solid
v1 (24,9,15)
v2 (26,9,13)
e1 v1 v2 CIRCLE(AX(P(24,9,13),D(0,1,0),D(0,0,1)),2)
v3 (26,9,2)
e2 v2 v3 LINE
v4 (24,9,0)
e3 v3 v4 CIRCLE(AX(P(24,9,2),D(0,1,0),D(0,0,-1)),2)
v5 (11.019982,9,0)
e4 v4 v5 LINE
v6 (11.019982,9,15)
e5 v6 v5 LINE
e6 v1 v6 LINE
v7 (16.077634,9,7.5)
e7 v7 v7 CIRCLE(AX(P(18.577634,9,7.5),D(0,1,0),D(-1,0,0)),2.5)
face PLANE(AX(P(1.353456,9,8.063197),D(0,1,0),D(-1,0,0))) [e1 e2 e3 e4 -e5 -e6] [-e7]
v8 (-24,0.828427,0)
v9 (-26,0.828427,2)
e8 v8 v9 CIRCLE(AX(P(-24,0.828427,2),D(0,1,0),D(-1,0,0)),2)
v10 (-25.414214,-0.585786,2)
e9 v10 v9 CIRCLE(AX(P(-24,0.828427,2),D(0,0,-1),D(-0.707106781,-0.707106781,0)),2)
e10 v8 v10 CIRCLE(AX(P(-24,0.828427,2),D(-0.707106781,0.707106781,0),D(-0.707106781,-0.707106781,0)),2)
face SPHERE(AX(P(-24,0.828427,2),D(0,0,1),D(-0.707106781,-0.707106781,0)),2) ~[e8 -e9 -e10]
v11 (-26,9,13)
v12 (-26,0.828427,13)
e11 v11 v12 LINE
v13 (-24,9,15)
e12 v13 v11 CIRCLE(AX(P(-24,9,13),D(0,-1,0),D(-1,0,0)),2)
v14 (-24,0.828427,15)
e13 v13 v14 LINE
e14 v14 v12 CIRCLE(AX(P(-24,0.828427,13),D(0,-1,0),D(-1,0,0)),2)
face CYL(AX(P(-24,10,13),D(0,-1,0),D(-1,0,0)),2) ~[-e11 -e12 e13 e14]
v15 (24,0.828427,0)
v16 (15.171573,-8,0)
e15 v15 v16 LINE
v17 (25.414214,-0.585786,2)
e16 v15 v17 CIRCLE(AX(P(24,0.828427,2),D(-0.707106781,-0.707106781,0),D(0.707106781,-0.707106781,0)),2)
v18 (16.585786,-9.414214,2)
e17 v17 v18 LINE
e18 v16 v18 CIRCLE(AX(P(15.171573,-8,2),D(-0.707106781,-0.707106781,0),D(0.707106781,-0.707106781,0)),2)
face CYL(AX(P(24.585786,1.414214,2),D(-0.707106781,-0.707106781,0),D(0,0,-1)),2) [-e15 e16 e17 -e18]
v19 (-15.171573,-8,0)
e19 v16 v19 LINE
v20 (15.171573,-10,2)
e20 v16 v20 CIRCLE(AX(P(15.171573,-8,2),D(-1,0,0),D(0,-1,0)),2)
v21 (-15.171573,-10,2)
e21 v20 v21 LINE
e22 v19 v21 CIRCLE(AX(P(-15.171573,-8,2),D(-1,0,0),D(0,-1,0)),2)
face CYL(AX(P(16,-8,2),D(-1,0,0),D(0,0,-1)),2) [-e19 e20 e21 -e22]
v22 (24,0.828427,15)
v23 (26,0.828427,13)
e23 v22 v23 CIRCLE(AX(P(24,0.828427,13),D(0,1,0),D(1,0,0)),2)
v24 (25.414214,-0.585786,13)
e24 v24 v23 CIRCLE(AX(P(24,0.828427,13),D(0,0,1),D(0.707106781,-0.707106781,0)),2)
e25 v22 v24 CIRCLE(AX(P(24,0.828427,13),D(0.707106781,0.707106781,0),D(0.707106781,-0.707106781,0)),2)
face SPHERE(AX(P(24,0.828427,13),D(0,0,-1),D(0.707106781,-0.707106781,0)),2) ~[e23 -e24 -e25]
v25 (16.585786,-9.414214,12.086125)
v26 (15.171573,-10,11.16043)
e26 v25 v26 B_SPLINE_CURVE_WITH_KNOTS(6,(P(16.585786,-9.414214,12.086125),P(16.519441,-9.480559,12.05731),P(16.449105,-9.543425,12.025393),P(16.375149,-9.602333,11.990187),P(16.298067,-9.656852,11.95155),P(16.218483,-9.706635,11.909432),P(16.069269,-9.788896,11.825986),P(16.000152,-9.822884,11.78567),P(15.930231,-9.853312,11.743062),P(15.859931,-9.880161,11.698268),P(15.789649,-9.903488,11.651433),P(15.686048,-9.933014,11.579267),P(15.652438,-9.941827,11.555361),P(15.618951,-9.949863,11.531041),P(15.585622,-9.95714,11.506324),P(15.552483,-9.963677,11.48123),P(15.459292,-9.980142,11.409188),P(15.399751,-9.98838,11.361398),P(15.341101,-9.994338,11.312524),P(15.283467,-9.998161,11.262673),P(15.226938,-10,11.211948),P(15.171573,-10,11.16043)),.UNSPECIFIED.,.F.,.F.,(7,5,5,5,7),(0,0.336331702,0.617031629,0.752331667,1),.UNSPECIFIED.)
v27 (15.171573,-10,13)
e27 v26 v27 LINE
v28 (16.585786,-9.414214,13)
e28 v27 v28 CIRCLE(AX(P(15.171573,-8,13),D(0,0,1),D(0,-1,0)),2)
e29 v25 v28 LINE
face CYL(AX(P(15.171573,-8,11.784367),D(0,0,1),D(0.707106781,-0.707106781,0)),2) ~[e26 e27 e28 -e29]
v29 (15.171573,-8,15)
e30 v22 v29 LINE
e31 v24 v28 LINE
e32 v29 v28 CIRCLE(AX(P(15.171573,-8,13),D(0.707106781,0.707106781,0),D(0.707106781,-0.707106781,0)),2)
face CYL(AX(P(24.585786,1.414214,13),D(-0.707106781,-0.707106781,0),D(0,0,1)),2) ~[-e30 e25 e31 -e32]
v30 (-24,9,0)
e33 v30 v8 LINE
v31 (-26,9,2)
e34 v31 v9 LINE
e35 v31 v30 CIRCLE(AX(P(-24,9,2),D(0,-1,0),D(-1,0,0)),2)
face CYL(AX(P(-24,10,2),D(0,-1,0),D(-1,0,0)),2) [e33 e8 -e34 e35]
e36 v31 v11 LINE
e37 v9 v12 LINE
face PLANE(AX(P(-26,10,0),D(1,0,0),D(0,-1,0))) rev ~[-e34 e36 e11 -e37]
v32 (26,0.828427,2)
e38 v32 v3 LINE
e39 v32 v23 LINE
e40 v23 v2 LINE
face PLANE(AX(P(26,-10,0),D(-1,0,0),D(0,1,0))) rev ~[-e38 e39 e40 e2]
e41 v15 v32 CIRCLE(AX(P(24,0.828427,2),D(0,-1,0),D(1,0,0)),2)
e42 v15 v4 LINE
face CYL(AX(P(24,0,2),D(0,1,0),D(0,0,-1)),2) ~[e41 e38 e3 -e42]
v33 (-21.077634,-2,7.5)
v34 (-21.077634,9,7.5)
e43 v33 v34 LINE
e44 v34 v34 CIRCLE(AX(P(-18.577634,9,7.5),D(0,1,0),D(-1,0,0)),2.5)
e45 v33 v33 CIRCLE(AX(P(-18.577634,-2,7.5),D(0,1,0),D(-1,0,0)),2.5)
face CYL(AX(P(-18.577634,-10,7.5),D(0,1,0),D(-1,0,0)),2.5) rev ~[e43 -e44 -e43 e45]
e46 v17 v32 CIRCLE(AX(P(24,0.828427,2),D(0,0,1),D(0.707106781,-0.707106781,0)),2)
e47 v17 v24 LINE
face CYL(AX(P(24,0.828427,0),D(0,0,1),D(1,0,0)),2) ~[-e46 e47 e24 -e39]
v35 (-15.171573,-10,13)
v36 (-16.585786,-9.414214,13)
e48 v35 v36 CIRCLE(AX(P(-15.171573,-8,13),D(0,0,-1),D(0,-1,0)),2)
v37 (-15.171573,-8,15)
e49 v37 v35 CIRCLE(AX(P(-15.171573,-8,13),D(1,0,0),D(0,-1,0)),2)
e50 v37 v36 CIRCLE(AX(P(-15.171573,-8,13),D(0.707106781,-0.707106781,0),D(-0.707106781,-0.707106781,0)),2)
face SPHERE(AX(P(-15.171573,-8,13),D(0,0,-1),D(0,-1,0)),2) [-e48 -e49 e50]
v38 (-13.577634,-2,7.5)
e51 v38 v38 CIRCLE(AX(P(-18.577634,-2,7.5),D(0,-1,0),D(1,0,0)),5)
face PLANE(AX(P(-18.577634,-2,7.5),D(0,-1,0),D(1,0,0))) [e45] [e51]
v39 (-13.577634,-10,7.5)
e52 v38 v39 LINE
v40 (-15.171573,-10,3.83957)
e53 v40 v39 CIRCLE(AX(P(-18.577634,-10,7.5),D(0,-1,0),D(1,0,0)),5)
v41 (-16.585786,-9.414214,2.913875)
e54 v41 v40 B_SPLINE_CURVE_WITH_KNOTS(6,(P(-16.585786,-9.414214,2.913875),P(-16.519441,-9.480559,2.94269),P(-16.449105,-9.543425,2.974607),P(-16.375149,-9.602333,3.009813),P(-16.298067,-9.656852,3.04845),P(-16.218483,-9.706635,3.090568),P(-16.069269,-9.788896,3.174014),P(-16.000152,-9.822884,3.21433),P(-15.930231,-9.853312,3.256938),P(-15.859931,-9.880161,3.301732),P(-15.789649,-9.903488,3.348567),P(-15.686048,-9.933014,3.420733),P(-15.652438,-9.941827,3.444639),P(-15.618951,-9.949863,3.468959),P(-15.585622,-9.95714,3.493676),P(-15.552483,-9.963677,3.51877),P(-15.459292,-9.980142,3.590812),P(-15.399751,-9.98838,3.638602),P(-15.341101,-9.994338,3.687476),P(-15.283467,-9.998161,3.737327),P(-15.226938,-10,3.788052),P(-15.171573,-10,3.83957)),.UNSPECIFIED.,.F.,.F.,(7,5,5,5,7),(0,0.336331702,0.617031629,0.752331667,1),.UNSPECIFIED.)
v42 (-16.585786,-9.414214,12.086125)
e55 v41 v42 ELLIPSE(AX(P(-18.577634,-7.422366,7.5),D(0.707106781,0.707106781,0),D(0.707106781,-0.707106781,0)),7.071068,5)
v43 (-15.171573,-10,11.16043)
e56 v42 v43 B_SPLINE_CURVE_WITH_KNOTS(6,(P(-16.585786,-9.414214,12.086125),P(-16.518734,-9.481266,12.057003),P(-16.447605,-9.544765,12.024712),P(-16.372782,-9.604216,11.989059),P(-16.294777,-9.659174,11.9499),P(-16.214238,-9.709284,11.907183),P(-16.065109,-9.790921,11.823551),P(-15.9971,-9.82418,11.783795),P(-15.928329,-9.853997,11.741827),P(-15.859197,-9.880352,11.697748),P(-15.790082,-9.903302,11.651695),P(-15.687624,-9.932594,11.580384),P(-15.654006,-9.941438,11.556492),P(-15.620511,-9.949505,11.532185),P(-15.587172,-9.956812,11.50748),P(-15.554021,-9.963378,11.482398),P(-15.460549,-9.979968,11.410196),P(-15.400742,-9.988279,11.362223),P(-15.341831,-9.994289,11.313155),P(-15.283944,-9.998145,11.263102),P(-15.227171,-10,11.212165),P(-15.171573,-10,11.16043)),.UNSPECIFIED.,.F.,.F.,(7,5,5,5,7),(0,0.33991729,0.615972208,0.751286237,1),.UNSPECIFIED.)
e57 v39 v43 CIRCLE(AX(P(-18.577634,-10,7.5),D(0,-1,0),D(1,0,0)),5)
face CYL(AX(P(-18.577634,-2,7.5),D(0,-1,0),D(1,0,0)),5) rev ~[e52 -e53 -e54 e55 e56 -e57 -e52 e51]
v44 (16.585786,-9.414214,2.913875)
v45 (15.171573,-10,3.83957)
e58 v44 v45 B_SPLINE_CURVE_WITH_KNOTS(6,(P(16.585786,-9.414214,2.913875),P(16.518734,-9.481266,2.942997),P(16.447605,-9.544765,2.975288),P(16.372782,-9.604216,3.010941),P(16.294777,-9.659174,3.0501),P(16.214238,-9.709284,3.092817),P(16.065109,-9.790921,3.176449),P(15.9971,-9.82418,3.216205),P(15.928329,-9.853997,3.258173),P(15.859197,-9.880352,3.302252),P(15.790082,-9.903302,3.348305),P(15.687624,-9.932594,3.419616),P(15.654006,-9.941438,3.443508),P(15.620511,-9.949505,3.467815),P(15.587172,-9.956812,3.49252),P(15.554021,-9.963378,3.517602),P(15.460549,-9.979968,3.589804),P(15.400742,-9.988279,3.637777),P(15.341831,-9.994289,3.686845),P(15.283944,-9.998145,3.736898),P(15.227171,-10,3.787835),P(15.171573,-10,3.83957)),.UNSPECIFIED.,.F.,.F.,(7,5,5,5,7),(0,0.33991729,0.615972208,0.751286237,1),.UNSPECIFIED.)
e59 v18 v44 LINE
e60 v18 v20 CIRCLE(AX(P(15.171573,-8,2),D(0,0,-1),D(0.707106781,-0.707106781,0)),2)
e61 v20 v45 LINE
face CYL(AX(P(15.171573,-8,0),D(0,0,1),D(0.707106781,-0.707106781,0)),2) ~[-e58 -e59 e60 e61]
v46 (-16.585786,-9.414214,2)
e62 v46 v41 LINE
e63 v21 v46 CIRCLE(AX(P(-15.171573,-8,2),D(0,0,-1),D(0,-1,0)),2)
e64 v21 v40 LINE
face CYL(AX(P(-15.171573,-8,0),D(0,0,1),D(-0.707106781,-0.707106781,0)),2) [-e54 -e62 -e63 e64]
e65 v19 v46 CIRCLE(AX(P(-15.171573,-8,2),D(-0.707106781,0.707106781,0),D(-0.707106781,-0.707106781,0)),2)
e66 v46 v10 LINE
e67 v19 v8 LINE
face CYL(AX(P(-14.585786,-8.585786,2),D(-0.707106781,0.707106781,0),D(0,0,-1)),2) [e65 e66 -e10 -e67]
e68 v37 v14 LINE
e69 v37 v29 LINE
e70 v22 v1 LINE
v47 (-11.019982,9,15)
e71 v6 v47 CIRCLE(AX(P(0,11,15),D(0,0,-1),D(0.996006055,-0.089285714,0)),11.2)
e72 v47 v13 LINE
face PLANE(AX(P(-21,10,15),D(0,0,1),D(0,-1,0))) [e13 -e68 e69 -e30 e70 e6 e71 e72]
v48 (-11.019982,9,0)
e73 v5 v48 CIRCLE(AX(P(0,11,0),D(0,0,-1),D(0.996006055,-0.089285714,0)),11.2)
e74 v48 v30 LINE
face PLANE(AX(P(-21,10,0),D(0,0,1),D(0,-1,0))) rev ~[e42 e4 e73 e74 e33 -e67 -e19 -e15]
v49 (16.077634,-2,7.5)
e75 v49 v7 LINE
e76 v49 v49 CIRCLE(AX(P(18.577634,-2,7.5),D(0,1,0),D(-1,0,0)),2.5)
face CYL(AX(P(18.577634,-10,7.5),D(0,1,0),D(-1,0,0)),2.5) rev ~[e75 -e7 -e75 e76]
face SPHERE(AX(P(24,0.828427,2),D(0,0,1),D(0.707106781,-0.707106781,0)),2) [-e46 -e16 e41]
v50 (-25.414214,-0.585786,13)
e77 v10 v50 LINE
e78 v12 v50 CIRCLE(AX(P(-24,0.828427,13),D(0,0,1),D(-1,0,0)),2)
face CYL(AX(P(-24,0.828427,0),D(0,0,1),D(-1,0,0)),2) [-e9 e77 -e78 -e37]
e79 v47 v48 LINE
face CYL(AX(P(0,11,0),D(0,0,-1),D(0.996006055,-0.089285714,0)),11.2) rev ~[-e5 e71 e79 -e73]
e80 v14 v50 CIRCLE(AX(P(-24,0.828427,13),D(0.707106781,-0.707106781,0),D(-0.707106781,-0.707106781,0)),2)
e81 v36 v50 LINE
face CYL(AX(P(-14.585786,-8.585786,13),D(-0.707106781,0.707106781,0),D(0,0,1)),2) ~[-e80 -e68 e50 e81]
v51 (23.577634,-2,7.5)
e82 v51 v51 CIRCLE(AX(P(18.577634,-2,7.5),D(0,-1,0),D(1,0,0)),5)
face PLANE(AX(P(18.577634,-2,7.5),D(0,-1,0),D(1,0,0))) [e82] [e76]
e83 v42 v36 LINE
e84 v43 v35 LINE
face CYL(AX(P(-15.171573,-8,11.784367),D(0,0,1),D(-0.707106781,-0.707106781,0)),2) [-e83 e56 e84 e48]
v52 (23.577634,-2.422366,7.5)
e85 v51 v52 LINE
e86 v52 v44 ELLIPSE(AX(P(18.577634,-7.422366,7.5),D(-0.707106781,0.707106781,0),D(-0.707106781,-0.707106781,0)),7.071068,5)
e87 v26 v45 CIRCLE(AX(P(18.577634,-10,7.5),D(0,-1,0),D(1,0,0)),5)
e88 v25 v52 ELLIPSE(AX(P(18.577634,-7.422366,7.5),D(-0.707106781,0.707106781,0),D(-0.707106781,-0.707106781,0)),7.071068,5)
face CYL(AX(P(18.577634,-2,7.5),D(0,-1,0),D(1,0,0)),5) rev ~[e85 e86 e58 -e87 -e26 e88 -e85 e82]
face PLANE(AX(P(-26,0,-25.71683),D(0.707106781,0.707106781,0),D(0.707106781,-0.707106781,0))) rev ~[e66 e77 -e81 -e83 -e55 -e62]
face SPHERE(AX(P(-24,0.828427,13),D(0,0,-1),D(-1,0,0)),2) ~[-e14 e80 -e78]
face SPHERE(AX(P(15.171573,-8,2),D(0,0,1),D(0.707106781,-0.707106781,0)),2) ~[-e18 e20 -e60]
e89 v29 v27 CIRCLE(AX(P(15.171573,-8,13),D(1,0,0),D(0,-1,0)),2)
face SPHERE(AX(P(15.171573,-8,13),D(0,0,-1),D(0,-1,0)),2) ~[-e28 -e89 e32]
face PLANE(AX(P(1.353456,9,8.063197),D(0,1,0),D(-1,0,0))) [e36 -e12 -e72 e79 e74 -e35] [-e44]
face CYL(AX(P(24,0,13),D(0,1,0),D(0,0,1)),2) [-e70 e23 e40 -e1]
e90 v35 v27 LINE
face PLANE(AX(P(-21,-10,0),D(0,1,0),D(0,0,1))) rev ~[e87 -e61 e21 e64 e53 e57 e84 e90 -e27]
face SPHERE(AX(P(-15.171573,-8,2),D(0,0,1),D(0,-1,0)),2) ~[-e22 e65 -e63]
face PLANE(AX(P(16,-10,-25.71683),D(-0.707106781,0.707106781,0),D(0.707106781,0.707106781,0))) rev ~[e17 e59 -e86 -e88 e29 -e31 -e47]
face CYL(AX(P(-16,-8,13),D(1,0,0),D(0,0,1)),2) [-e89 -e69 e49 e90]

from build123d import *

# Parameters (mm, degrees)
F1_DEPTH       = 15
F2_DEPTH       = 5
F3_DEPTH       = 5
F5_D           = 5
F5_CBORE_D     = 10
F5_CBORE_DEPTH = 8
F6_T1_DEPTH    = 66.4336597593
F7_R           = 2
F8_W           = 54.7069119513
F8_H           = 16.1263942719
F9_DEPTH       = 1


# Not quite as in the source:
# - a fillet or chamfer that OpenCascade refuses, or shapes differently, is made with other operations: its cross-section is extruded or revolved along the edge and cut away or added


with BuildPart() as f1:
    # F0 (on Top) → F1 (new body)
    with BuildSketch(Plane.XY):
        with BuildLine():
            Line((-21, -10), (21, -10))
            Line((21, -10), (21, 10))
            Line((21, 10), (11.1552678139, 10))
            ThreePointArc((11.1552678139, 10), (0, -0.2), (-11.1552678139, 10))
            Line((-11.1552678139, 10), (-21, 10))
            Line((-21, 10), (-21, -10))
        make_face()
    extrude(amount=F1_DEPTH)

    # F2 (add): a face of the model
    f2_faces = [f1.faces().sort_by_distance(p)[0] for p in [
        (21, 0, 7.5),
    ]]
    extrude(f2_faces, amount=F2_DEPTH)

    # F3 (add): a face of the model
    f3_faces = [f1.faces().sort_by_distance(p)[0] for p in [
        (-21, 0, 7.5),
    ]]
    extrude(f3_faces, amount=F3_DEPTH)

    # F5 (through all)
    with Locations(Plane.XZ.offset(10)):
        with Locations((18.577633907, 7.5), (-18.577633907, 7.5)):
            CounterBoreHole(F5_D / 2, F5_CBORE_D / 2, F5_CBORE_DEPTH)

    # F6: chamfer of 10 on 2 edges, made by hand

    # F6_s2 → F6_t1 (cut)
    with BuildSketch(Plane.XY.offset(-25.7168298797)):
        Polygon((16, -10), (26, 0), (26, -10), align=None)
        Polygon((-26, 0), (-16, -10), (-26, -10), align=None)
    extrude(amount=F6_T1_DEPTH, mode=Mode.SUBTRACT)

    # F7
    f7_edges = [f1.edges().sort_by_distance(p)[0] for p in [
        (0, -10, 15),
        (21, -5, 15),
        (-26, 5, 15),
        (26, 5, 15),
        (-21, -5, 15),
        (21, -5, 0),
        (0, -10, 0),
        (-21, -5, 0),
        (26, 5, 0),
        (-26, 5, 0),
        (16, -10, 13.392184),
        (16, -10, 1.607816),
        (-16, -10, 1.607816),
        (-16, -10, 13.392184),
        (26, 0, 7.5),
        (-26, 0, 7.5),
    ]]
    fillet(f7_edges, radius=F7_R)

    # F8 (on face) → F9 (cut)
    with BuildSketch(Plane(origin=(0, 10, 0), x_dir=(-1, 0, 0), z_dir=(0, 1, 0))):
        with Locations((-1.3534559757, 8.0631971359)):
            Rectangle(F8_W, F8_H)
    extrude(amount=-F9_DEPTH, mode=Mode.SUBTRACT)


solid = f1.part
